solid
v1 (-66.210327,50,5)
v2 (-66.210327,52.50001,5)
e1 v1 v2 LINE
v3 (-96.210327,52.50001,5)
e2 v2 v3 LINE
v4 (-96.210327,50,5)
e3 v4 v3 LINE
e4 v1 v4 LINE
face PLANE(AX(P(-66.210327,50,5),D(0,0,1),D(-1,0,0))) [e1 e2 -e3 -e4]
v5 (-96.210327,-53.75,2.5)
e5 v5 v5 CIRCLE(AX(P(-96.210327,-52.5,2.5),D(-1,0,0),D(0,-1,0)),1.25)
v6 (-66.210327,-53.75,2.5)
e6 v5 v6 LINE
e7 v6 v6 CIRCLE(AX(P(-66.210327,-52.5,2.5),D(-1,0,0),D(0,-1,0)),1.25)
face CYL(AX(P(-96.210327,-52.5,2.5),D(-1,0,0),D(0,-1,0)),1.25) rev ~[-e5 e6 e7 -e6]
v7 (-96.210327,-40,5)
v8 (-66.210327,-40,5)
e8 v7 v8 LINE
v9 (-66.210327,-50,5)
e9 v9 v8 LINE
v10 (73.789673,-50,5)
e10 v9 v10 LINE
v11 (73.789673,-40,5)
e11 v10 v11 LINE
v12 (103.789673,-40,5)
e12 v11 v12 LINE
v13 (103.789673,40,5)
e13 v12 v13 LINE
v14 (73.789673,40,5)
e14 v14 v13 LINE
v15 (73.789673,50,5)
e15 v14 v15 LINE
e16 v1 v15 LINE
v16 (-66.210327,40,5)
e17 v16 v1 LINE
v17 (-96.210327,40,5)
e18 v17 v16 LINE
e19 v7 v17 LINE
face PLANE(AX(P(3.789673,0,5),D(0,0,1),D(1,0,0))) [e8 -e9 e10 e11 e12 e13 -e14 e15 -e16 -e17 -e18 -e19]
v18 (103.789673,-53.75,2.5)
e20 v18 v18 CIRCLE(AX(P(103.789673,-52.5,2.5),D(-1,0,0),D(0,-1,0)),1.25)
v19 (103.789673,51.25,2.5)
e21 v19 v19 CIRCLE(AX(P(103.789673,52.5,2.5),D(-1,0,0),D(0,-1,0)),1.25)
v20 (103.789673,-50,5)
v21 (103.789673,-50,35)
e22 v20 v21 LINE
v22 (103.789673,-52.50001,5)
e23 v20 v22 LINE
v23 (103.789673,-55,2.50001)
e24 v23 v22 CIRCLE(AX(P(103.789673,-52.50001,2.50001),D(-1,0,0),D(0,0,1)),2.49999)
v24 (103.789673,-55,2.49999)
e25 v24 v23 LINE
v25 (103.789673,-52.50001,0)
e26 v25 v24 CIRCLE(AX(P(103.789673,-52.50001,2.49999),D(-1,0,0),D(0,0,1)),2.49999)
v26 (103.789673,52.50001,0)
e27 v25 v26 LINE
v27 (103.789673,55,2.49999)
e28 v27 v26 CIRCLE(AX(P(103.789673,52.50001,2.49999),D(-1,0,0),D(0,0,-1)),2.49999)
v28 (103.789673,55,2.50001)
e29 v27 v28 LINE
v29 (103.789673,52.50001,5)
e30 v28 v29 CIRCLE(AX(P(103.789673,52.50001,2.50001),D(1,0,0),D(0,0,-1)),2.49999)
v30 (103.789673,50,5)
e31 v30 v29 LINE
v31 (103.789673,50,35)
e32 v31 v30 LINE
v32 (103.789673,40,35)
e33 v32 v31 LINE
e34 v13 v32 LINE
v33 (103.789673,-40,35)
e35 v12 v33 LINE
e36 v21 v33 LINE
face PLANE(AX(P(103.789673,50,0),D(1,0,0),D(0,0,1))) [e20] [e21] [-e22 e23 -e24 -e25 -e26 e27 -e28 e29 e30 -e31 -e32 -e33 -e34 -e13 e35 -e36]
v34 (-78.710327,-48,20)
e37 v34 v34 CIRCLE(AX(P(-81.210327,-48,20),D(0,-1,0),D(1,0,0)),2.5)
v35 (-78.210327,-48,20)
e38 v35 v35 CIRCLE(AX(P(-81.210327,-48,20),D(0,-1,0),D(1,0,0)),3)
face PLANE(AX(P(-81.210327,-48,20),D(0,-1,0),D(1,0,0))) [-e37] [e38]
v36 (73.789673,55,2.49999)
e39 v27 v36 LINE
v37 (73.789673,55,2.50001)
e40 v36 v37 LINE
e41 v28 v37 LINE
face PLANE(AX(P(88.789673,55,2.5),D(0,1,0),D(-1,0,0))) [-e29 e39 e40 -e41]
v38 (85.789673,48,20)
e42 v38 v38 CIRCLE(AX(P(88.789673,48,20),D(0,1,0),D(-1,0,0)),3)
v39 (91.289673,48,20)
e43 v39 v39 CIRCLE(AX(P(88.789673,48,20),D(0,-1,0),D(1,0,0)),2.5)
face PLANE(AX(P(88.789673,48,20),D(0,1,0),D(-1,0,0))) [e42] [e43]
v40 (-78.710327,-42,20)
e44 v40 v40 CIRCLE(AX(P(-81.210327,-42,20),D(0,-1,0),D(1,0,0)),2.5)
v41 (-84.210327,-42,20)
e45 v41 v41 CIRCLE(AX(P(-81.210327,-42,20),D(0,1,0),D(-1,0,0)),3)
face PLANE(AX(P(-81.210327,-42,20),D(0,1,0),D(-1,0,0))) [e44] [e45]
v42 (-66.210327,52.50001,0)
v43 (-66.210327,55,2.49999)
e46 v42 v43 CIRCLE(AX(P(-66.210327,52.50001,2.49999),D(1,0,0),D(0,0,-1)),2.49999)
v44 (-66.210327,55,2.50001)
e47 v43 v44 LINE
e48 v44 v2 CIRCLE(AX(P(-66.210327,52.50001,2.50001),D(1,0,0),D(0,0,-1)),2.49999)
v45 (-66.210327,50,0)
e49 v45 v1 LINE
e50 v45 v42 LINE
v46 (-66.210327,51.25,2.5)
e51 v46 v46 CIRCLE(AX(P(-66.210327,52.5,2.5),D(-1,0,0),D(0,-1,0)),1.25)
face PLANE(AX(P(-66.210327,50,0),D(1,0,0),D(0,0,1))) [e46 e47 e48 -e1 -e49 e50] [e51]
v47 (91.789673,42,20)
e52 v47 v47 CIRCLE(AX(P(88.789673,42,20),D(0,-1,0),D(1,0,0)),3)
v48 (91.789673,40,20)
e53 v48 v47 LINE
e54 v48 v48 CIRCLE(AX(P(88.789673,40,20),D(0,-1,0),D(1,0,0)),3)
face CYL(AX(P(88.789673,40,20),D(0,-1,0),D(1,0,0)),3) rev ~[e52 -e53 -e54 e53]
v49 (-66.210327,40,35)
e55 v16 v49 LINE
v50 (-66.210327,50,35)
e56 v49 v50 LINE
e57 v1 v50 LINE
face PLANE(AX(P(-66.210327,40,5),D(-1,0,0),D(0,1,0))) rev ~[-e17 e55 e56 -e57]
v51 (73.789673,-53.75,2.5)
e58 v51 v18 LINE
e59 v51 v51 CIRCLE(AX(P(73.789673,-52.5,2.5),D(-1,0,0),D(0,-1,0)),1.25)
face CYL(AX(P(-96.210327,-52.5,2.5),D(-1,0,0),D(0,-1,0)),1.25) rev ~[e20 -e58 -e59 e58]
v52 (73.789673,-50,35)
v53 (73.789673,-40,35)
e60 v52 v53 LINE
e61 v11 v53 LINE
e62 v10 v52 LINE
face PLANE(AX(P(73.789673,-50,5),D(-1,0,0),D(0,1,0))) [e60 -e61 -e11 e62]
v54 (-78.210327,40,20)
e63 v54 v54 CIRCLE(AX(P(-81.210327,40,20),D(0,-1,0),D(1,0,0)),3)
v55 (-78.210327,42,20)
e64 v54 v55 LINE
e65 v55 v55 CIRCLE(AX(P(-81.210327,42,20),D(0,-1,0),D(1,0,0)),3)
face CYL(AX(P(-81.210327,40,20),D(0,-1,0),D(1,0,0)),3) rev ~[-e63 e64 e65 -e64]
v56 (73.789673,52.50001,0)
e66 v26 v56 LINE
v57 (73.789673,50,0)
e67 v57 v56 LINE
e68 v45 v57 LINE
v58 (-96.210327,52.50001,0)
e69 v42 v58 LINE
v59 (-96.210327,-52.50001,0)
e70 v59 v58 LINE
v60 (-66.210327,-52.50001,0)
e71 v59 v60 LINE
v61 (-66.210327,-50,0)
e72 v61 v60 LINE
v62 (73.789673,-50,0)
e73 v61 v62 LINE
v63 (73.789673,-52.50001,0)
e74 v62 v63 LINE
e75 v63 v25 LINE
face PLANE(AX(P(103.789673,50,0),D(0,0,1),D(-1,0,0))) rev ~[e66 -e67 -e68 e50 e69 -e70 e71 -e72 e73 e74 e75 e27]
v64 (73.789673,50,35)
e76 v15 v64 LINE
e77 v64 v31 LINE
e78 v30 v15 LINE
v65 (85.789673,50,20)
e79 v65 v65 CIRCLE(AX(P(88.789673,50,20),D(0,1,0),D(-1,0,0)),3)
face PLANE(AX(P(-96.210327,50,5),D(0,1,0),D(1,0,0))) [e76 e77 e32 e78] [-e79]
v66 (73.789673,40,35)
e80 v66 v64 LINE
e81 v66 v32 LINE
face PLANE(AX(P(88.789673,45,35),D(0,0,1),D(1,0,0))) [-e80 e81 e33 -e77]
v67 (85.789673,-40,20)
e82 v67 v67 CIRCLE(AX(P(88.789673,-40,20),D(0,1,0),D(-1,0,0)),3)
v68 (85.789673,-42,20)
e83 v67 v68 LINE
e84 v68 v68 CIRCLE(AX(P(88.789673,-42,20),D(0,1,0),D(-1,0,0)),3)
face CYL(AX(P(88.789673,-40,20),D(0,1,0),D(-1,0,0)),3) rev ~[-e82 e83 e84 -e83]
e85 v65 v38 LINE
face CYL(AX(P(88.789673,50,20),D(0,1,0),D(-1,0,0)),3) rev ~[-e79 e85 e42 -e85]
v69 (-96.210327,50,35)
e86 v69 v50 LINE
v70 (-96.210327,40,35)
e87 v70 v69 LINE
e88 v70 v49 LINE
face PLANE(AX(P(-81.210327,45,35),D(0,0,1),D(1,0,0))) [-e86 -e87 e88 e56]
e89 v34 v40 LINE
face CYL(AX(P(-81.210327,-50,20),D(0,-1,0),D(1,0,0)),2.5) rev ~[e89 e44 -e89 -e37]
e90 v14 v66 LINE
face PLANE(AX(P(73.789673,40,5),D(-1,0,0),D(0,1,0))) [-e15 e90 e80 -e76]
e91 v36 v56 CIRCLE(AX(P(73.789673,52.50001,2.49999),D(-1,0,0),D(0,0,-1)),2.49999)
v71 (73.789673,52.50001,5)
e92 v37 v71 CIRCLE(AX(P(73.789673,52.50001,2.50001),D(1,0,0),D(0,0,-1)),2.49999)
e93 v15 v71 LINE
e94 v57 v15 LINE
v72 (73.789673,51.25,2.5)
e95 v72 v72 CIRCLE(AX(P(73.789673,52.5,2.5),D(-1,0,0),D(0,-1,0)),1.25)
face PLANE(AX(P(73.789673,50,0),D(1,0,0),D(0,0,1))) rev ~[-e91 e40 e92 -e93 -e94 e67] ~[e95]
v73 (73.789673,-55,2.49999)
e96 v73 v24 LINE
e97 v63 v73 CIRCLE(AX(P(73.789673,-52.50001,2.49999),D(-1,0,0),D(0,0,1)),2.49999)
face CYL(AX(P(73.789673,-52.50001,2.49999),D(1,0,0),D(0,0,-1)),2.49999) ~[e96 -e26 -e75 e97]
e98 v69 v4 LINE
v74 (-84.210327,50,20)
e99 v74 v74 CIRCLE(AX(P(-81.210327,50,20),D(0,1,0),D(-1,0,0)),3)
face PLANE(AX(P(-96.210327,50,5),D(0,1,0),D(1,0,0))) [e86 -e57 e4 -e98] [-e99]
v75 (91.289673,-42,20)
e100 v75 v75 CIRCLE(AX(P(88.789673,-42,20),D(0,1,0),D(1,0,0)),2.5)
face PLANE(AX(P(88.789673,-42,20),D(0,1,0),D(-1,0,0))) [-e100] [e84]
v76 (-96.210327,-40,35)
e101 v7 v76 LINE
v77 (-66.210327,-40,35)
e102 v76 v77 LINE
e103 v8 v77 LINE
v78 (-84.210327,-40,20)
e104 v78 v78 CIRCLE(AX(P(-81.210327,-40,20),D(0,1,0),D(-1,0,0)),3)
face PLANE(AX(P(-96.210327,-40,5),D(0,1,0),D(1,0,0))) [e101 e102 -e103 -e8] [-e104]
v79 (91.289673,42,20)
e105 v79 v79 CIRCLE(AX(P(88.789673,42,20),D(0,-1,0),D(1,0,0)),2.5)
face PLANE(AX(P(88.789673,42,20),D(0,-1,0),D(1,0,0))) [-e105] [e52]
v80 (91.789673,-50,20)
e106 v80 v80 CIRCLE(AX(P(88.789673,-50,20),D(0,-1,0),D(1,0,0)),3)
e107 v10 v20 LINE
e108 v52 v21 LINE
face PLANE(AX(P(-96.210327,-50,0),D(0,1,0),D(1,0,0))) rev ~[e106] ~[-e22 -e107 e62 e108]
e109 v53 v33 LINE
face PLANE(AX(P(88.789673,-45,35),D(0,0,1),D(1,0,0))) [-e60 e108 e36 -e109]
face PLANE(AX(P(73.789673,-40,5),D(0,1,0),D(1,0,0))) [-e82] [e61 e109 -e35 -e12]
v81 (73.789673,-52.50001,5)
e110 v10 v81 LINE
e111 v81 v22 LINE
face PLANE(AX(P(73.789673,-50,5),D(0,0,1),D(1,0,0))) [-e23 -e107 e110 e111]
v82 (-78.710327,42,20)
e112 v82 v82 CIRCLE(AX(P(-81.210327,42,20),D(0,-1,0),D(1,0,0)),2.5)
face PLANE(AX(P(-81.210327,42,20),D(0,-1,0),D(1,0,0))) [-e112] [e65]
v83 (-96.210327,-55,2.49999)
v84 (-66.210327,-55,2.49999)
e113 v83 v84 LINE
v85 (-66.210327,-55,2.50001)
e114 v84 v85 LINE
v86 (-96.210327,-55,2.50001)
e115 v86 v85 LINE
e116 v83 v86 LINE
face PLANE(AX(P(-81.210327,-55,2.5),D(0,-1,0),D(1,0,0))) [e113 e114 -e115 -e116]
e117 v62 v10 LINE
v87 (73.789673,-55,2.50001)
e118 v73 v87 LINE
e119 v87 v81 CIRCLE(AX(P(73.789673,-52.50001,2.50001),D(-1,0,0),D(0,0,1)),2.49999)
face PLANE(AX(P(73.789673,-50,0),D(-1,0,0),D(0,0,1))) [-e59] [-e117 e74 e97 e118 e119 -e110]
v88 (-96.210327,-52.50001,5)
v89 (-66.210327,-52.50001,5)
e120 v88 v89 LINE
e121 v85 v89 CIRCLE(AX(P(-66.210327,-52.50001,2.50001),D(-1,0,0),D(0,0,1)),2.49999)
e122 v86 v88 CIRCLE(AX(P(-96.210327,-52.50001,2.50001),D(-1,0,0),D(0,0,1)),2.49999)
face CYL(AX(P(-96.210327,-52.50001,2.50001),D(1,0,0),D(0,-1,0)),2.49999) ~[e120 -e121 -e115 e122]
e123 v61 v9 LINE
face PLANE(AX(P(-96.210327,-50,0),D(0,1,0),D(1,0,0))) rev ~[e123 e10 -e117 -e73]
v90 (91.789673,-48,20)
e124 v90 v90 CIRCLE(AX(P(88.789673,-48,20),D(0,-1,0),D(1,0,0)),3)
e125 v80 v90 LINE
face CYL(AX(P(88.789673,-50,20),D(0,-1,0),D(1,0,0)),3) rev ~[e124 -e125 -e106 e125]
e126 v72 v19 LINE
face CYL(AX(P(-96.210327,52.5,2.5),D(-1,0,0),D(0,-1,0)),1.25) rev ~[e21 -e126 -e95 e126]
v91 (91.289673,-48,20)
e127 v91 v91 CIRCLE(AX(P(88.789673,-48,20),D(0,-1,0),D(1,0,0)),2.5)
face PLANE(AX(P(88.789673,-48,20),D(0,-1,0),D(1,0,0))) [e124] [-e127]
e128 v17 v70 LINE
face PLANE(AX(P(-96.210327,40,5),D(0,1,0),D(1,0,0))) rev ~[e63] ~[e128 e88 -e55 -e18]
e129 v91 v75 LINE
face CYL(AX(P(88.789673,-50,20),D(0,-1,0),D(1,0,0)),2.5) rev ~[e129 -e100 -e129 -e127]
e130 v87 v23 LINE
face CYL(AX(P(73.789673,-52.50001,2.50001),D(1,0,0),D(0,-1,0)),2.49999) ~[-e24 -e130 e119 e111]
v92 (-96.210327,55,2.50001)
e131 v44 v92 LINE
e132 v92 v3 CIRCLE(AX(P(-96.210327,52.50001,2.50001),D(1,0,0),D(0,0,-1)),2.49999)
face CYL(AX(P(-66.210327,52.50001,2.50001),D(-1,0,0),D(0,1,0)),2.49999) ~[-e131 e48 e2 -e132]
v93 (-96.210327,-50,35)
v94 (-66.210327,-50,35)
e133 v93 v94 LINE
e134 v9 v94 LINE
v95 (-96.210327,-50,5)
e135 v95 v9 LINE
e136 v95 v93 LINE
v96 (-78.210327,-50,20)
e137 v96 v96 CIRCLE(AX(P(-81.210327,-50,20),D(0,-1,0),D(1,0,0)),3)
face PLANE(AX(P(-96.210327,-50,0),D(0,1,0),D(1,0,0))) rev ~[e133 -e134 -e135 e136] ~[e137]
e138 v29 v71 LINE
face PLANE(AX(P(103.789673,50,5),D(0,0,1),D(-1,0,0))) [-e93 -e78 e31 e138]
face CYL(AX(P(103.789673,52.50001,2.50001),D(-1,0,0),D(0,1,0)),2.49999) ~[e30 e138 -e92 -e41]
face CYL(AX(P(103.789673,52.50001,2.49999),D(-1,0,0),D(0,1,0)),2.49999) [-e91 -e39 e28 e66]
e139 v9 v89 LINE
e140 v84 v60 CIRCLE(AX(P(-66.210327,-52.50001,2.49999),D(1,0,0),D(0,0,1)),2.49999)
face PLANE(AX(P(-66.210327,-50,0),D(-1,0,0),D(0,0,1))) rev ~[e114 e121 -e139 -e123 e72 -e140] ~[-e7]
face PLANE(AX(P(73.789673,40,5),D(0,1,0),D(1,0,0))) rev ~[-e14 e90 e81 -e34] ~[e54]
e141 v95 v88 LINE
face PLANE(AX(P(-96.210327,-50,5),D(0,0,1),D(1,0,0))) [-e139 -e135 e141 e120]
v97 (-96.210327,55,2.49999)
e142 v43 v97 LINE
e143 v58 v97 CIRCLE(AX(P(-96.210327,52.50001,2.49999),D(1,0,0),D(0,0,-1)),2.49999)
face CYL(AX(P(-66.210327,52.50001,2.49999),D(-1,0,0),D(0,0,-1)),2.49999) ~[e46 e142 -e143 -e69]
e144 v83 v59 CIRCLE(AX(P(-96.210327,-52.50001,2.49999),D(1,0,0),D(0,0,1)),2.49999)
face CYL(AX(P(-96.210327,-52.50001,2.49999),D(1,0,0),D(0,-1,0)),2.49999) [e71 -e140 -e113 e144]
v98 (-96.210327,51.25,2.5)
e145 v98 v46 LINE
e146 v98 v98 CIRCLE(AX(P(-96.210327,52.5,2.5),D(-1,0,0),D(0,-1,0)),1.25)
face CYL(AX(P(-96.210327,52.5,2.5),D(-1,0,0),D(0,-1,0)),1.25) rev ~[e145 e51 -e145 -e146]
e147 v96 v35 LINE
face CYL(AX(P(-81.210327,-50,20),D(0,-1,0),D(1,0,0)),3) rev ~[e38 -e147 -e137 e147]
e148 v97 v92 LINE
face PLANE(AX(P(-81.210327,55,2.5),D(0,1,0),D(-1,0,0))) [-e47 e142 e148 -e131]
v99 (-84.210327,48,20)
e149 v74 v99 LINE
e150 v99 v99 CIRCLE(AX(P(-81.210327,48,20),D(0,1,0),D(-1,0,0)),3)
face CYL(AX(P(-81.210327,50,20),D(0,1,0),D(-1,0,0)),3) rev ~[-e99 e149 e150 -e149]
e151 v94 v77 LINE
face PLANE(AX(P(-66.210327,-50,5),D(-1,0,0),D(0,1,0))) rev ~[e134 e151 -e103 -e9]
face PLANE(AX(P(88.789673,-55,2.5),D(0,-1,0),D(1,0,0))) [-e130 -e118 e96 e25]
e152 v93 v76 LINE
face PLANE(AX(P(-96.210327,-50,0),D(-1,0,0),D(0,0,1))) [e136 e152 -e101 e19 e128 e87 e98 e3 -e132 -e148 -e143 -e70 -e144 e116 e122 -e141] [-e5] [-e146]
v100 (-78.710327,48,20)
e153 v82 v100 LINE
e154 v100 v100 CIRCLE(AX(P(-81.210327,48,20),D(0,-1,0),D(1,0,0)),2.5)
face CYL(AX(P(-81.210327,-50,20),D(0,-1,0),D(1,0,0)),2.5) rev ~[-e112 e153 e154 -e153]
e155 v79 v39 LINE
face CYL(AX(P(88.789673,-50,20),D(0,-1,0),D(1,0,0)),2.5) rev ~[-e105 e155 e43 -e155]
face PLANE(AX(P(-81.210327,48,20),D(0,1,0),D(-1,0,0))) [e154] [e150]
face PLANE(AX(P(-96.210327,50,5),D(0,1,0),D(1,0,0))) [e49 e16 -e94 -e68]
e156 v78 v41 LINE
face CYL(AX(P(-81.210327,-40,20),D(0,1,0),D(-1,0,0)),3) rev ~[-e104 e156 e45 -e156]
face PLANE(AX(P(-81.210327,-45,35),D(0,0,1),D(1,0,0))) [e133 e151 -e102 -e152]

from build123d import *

# Parameters (mm, degrees)
F0_W          = 200
F0_H          = 100
F1_DEPTH      = 5
F2_W          = 30
F2_H          = 10
F3_DEPTH      = 30
F4_R          = 2.5
F5_DEPTH      = 100.001
F6_R          = 3
F6_R_2        = 2.5
F7_DEPTH      = 2
F7_DEPTH_BACK = 25
F8_R          = 3
F8_R_2        = 2.5
F9_DEPTH      = 2
F10_R         = 3
F10_R_2       = 2.5
F11_DEPTH     = 2
F12_R         = 3
F12_R_2       = 2.5
F13_DEPTH     = 2
F14_R         = 3
F14_R_2       = 2.5
F15_DEPTH     = 2
F16_R         = 3
F16_R_2       = 2.5
F17_DEPTH     = 2
F18_W         = 30
F18_H         = 5
F19_DEPTH     = 5
F20_R         = 1.25
F21_DEPTH     = 200.001
F22_R         = 2.49999
F23_W         = 30
F23_H         = 5
F24_DEPTH     = 5
F25_R         = 1.25
F26_DEPTH     = 200.001
F27_R         = 2.49999


# Not quite as in the source:
# - a fillet or chamfer is up to 0.001 mm smaller than in the source, because OpenCascade refuses the exact size


with BuildPart() as f1:
    # F0 (on Top) → F1 (new body)
    with BuildSketch(Plane.XY):
        with Locations((3.7896726225, 0)):
            Rectangle(F0_W, F0_H)
    extrude(amount=F1_DEPTH)

    # F2 (on face) → F3 (join)
    with BuildSketch(Plane.XY.offset(5)):
        with Locations((-81.2103273775, 45)):
            Rectangle(F2_W, F2_H)
        with Locations((88.7896726225, 45)):
            Rectangle(F2_W, F2_H)
        with Locations((-81.2103273775, -45)):
            Rectangle(F2_W, F2_H)
        with Locations((88.7896726225, -45)):
            Rectangle(F2_W, F2_H)
    extrude(amount=F3_DEPTH)

    # F4 (on face) → F5 (cut, through all)
    with BuildSketch(Plane.XZ.offset(50)):
        with Locations((88.7896726225, 20)):
            Circle(F4_R)
        with Locations((-81.2103273775, 20)):
            Circle(F4_R)
    extrude(amount=-F5_DEPTH, mode=Mode.SUBTRACT)

    # F6 (on face) → F7 (cut, two sides)
    with BuildSketch(Plane.XZ.offset(50)) as f7_sk:
        with Locations((88.7896726225, 20)):
            Circle(F6_R)
        with Locations((88.7896726225, 20)):
            Circle(F6_R_2, mode=Mode.SUBTRACT)
        with Locations((-81.2103273775, 20)):
            Circle(F6_R)
        with Locations((-81.2103273775, 20)):
            Circle(F6_R_2, mode=Mode.SUBTRACT)
    extrude(amount=-F7_DEPTH, mode=Mode.SUBTRACT)
    extrude(f7_sk.sketch, amount=F7_DEPTH_BACK, mode=Mode.SUBTRACT)

    # F8 (on face) → F9 (cut)
    with BuildSketch(Plane.XZ.offset(-40)):
        with Locations((-81.2103273775, 20)):
            Circle(F8_R)
        with Locations((-81.2103273775, 20)):
            Circle(F8_R_2, mode=Mode.SUBTRACT)
    extrude(amount=-F9_DEPTH, mode=Mode.SUBTRACT)

    # F10 (on face) → F11 (cut)
    with BuildSketch(Plane.XZ.offset(-40)):
        with Locations((88.7896726225, 20)):
            Circle(F10_R)
        with Locations((88.7896726225, 20)):
            Circle(F10_R_2, mode=Mode.SUBTRACT)
    extrude(amount=-F11_DEPTH, mode=Mode.SUBTRACT)

    # F12 (on face) → F13 (cut)
    with BuildSketch(Plane(origin=(0, 50, 0), x_dir=(-1, 0, 0), z_dir=(0, 1, 0))):
        with Locations((81.2103273775, 20)):
            Circle(F12_R)
        with Locations((81.2103273775, 20)):
            Circle(F12_R_2, mode=Mode.SUBTRACT)
        with Locations((-88.7896726225, 20)):
            Circle(F12_R)
        with Locations((-88.7896726225, 20)):
            Circle(F12_R_2, mode=Mode.SUBTRACT)
    extrude(amount=-F13_DEPTH, mode=Mode.SUBTRACT)

    # F14 (on face) → F15 (cut)
    with BuildSketch(Plane(origin=(0, -40, 0), x_dir=(-1, 0, 0), z_dir=(0, 1, 0))):
        with Locations((81.2103273775, 20)):
            Circle(F14_R)
        with Locations((81.2103273775, 20)):
            Circle(F14_R_2, mode=Mode.SUBTRACT)
        with Locations((81.2103273775, 20)):
            Circle(F14_R_2)
    extrude(amount=-F15_DEPTH, mode=Mode.SUBTRACT)

    # F16 (on face) → F17 (cut)
    with BuildSketch(Plane(origin=(0, -40, 0), x_dir=(-1, 0, 0), z_dir=(0, 1, 0))):
        with Locations((-88.7896726225, 20)):
            Circle(F16_R)
        with Locations((-88.7896726225, 20)):
            Circle(F16_R_2, mode=Mode.SUBTRACT)
    extrude(amount=-F17_DEPTH, mode=Mode.SUBTRACT)

    # F18 (on face) → F19 (join)
    with BuildSketch(Plane.XZ.offset(50)):
        with Locations((-81.2103273775, 2.5)):
            Rectangle(F18_W, F18_H)
        with Locations((88.7896726225, 2.5)):
            Rectangle(F18_W, F18_H)
    extrude(amount=F19_DEPTH)

    # F20 (on face) → F21 (cut, through all)
    with BuildSketch(Plane(origin=(-96.2103273775, 0, 0), x_dir=(0, -1, 0), z_dir=(-1, 0, 0))):
        with Locations((52.5, 2.5)):
            Circle(F20_R)
    extrude(amount=-F21_DEPTH, mode=Mode.SUBTRACT)

    # F22 (radius 2.5 in the source; OpenCascade refuses exactly that, so slightly less here)
    f22_edges = [f1.edges().sort_by_distance(p)[0] for p in [
        (-81.210327, -55, 5),
        (-81.210327, -55, 0),
        (88.789673, -55, 5),
        (88.789673, -55, 0),
    ]]
    fillet(f22_edges, radius=F22_R)

    # F23 (on face) → F24 (join)
    with BuildSketch(Plane(origin=(0, 50, 0), x_dir=(-1, 0, 0), z_dir=(0, 1, 0))):
        with Locations((-88.7896726225, 2.5)):
            Rectangle(F23_W, F23_H)
        with Locations((81.2103273775, 2.5)):
            Rectangle(F23_W, F23_H)
    extrude(amount=F24_DEPTH)

    # F25 (on face) → F26 (cut, through all)
    with BuildSketch(Plane(origin=(-96.2103273775, 0, 0), x_dir=(0, -1, 0), z_dir=(-1, 0, 0))):
        with Locations((-52.5, 2.5)):
            Circle(F25_R)
    extrude(amount=-F26_DEPTH, mode=Mode.SUBTRACT)

    # F27 (radius 2.5 in the source; OpenCascade refuses exactly that, so slightly less here)
    f27_edges = [f1.edges().sort_by_distance(p)[0] for p in [
        (88.789673, 55, 5),
        (88.789673, 55, 0),
        (-81.210327, 55, 0),
        (-81.210327, 55, 5),
    ]]
    fillet(f27_edges, radius=F27_R)


solid = f1.part
